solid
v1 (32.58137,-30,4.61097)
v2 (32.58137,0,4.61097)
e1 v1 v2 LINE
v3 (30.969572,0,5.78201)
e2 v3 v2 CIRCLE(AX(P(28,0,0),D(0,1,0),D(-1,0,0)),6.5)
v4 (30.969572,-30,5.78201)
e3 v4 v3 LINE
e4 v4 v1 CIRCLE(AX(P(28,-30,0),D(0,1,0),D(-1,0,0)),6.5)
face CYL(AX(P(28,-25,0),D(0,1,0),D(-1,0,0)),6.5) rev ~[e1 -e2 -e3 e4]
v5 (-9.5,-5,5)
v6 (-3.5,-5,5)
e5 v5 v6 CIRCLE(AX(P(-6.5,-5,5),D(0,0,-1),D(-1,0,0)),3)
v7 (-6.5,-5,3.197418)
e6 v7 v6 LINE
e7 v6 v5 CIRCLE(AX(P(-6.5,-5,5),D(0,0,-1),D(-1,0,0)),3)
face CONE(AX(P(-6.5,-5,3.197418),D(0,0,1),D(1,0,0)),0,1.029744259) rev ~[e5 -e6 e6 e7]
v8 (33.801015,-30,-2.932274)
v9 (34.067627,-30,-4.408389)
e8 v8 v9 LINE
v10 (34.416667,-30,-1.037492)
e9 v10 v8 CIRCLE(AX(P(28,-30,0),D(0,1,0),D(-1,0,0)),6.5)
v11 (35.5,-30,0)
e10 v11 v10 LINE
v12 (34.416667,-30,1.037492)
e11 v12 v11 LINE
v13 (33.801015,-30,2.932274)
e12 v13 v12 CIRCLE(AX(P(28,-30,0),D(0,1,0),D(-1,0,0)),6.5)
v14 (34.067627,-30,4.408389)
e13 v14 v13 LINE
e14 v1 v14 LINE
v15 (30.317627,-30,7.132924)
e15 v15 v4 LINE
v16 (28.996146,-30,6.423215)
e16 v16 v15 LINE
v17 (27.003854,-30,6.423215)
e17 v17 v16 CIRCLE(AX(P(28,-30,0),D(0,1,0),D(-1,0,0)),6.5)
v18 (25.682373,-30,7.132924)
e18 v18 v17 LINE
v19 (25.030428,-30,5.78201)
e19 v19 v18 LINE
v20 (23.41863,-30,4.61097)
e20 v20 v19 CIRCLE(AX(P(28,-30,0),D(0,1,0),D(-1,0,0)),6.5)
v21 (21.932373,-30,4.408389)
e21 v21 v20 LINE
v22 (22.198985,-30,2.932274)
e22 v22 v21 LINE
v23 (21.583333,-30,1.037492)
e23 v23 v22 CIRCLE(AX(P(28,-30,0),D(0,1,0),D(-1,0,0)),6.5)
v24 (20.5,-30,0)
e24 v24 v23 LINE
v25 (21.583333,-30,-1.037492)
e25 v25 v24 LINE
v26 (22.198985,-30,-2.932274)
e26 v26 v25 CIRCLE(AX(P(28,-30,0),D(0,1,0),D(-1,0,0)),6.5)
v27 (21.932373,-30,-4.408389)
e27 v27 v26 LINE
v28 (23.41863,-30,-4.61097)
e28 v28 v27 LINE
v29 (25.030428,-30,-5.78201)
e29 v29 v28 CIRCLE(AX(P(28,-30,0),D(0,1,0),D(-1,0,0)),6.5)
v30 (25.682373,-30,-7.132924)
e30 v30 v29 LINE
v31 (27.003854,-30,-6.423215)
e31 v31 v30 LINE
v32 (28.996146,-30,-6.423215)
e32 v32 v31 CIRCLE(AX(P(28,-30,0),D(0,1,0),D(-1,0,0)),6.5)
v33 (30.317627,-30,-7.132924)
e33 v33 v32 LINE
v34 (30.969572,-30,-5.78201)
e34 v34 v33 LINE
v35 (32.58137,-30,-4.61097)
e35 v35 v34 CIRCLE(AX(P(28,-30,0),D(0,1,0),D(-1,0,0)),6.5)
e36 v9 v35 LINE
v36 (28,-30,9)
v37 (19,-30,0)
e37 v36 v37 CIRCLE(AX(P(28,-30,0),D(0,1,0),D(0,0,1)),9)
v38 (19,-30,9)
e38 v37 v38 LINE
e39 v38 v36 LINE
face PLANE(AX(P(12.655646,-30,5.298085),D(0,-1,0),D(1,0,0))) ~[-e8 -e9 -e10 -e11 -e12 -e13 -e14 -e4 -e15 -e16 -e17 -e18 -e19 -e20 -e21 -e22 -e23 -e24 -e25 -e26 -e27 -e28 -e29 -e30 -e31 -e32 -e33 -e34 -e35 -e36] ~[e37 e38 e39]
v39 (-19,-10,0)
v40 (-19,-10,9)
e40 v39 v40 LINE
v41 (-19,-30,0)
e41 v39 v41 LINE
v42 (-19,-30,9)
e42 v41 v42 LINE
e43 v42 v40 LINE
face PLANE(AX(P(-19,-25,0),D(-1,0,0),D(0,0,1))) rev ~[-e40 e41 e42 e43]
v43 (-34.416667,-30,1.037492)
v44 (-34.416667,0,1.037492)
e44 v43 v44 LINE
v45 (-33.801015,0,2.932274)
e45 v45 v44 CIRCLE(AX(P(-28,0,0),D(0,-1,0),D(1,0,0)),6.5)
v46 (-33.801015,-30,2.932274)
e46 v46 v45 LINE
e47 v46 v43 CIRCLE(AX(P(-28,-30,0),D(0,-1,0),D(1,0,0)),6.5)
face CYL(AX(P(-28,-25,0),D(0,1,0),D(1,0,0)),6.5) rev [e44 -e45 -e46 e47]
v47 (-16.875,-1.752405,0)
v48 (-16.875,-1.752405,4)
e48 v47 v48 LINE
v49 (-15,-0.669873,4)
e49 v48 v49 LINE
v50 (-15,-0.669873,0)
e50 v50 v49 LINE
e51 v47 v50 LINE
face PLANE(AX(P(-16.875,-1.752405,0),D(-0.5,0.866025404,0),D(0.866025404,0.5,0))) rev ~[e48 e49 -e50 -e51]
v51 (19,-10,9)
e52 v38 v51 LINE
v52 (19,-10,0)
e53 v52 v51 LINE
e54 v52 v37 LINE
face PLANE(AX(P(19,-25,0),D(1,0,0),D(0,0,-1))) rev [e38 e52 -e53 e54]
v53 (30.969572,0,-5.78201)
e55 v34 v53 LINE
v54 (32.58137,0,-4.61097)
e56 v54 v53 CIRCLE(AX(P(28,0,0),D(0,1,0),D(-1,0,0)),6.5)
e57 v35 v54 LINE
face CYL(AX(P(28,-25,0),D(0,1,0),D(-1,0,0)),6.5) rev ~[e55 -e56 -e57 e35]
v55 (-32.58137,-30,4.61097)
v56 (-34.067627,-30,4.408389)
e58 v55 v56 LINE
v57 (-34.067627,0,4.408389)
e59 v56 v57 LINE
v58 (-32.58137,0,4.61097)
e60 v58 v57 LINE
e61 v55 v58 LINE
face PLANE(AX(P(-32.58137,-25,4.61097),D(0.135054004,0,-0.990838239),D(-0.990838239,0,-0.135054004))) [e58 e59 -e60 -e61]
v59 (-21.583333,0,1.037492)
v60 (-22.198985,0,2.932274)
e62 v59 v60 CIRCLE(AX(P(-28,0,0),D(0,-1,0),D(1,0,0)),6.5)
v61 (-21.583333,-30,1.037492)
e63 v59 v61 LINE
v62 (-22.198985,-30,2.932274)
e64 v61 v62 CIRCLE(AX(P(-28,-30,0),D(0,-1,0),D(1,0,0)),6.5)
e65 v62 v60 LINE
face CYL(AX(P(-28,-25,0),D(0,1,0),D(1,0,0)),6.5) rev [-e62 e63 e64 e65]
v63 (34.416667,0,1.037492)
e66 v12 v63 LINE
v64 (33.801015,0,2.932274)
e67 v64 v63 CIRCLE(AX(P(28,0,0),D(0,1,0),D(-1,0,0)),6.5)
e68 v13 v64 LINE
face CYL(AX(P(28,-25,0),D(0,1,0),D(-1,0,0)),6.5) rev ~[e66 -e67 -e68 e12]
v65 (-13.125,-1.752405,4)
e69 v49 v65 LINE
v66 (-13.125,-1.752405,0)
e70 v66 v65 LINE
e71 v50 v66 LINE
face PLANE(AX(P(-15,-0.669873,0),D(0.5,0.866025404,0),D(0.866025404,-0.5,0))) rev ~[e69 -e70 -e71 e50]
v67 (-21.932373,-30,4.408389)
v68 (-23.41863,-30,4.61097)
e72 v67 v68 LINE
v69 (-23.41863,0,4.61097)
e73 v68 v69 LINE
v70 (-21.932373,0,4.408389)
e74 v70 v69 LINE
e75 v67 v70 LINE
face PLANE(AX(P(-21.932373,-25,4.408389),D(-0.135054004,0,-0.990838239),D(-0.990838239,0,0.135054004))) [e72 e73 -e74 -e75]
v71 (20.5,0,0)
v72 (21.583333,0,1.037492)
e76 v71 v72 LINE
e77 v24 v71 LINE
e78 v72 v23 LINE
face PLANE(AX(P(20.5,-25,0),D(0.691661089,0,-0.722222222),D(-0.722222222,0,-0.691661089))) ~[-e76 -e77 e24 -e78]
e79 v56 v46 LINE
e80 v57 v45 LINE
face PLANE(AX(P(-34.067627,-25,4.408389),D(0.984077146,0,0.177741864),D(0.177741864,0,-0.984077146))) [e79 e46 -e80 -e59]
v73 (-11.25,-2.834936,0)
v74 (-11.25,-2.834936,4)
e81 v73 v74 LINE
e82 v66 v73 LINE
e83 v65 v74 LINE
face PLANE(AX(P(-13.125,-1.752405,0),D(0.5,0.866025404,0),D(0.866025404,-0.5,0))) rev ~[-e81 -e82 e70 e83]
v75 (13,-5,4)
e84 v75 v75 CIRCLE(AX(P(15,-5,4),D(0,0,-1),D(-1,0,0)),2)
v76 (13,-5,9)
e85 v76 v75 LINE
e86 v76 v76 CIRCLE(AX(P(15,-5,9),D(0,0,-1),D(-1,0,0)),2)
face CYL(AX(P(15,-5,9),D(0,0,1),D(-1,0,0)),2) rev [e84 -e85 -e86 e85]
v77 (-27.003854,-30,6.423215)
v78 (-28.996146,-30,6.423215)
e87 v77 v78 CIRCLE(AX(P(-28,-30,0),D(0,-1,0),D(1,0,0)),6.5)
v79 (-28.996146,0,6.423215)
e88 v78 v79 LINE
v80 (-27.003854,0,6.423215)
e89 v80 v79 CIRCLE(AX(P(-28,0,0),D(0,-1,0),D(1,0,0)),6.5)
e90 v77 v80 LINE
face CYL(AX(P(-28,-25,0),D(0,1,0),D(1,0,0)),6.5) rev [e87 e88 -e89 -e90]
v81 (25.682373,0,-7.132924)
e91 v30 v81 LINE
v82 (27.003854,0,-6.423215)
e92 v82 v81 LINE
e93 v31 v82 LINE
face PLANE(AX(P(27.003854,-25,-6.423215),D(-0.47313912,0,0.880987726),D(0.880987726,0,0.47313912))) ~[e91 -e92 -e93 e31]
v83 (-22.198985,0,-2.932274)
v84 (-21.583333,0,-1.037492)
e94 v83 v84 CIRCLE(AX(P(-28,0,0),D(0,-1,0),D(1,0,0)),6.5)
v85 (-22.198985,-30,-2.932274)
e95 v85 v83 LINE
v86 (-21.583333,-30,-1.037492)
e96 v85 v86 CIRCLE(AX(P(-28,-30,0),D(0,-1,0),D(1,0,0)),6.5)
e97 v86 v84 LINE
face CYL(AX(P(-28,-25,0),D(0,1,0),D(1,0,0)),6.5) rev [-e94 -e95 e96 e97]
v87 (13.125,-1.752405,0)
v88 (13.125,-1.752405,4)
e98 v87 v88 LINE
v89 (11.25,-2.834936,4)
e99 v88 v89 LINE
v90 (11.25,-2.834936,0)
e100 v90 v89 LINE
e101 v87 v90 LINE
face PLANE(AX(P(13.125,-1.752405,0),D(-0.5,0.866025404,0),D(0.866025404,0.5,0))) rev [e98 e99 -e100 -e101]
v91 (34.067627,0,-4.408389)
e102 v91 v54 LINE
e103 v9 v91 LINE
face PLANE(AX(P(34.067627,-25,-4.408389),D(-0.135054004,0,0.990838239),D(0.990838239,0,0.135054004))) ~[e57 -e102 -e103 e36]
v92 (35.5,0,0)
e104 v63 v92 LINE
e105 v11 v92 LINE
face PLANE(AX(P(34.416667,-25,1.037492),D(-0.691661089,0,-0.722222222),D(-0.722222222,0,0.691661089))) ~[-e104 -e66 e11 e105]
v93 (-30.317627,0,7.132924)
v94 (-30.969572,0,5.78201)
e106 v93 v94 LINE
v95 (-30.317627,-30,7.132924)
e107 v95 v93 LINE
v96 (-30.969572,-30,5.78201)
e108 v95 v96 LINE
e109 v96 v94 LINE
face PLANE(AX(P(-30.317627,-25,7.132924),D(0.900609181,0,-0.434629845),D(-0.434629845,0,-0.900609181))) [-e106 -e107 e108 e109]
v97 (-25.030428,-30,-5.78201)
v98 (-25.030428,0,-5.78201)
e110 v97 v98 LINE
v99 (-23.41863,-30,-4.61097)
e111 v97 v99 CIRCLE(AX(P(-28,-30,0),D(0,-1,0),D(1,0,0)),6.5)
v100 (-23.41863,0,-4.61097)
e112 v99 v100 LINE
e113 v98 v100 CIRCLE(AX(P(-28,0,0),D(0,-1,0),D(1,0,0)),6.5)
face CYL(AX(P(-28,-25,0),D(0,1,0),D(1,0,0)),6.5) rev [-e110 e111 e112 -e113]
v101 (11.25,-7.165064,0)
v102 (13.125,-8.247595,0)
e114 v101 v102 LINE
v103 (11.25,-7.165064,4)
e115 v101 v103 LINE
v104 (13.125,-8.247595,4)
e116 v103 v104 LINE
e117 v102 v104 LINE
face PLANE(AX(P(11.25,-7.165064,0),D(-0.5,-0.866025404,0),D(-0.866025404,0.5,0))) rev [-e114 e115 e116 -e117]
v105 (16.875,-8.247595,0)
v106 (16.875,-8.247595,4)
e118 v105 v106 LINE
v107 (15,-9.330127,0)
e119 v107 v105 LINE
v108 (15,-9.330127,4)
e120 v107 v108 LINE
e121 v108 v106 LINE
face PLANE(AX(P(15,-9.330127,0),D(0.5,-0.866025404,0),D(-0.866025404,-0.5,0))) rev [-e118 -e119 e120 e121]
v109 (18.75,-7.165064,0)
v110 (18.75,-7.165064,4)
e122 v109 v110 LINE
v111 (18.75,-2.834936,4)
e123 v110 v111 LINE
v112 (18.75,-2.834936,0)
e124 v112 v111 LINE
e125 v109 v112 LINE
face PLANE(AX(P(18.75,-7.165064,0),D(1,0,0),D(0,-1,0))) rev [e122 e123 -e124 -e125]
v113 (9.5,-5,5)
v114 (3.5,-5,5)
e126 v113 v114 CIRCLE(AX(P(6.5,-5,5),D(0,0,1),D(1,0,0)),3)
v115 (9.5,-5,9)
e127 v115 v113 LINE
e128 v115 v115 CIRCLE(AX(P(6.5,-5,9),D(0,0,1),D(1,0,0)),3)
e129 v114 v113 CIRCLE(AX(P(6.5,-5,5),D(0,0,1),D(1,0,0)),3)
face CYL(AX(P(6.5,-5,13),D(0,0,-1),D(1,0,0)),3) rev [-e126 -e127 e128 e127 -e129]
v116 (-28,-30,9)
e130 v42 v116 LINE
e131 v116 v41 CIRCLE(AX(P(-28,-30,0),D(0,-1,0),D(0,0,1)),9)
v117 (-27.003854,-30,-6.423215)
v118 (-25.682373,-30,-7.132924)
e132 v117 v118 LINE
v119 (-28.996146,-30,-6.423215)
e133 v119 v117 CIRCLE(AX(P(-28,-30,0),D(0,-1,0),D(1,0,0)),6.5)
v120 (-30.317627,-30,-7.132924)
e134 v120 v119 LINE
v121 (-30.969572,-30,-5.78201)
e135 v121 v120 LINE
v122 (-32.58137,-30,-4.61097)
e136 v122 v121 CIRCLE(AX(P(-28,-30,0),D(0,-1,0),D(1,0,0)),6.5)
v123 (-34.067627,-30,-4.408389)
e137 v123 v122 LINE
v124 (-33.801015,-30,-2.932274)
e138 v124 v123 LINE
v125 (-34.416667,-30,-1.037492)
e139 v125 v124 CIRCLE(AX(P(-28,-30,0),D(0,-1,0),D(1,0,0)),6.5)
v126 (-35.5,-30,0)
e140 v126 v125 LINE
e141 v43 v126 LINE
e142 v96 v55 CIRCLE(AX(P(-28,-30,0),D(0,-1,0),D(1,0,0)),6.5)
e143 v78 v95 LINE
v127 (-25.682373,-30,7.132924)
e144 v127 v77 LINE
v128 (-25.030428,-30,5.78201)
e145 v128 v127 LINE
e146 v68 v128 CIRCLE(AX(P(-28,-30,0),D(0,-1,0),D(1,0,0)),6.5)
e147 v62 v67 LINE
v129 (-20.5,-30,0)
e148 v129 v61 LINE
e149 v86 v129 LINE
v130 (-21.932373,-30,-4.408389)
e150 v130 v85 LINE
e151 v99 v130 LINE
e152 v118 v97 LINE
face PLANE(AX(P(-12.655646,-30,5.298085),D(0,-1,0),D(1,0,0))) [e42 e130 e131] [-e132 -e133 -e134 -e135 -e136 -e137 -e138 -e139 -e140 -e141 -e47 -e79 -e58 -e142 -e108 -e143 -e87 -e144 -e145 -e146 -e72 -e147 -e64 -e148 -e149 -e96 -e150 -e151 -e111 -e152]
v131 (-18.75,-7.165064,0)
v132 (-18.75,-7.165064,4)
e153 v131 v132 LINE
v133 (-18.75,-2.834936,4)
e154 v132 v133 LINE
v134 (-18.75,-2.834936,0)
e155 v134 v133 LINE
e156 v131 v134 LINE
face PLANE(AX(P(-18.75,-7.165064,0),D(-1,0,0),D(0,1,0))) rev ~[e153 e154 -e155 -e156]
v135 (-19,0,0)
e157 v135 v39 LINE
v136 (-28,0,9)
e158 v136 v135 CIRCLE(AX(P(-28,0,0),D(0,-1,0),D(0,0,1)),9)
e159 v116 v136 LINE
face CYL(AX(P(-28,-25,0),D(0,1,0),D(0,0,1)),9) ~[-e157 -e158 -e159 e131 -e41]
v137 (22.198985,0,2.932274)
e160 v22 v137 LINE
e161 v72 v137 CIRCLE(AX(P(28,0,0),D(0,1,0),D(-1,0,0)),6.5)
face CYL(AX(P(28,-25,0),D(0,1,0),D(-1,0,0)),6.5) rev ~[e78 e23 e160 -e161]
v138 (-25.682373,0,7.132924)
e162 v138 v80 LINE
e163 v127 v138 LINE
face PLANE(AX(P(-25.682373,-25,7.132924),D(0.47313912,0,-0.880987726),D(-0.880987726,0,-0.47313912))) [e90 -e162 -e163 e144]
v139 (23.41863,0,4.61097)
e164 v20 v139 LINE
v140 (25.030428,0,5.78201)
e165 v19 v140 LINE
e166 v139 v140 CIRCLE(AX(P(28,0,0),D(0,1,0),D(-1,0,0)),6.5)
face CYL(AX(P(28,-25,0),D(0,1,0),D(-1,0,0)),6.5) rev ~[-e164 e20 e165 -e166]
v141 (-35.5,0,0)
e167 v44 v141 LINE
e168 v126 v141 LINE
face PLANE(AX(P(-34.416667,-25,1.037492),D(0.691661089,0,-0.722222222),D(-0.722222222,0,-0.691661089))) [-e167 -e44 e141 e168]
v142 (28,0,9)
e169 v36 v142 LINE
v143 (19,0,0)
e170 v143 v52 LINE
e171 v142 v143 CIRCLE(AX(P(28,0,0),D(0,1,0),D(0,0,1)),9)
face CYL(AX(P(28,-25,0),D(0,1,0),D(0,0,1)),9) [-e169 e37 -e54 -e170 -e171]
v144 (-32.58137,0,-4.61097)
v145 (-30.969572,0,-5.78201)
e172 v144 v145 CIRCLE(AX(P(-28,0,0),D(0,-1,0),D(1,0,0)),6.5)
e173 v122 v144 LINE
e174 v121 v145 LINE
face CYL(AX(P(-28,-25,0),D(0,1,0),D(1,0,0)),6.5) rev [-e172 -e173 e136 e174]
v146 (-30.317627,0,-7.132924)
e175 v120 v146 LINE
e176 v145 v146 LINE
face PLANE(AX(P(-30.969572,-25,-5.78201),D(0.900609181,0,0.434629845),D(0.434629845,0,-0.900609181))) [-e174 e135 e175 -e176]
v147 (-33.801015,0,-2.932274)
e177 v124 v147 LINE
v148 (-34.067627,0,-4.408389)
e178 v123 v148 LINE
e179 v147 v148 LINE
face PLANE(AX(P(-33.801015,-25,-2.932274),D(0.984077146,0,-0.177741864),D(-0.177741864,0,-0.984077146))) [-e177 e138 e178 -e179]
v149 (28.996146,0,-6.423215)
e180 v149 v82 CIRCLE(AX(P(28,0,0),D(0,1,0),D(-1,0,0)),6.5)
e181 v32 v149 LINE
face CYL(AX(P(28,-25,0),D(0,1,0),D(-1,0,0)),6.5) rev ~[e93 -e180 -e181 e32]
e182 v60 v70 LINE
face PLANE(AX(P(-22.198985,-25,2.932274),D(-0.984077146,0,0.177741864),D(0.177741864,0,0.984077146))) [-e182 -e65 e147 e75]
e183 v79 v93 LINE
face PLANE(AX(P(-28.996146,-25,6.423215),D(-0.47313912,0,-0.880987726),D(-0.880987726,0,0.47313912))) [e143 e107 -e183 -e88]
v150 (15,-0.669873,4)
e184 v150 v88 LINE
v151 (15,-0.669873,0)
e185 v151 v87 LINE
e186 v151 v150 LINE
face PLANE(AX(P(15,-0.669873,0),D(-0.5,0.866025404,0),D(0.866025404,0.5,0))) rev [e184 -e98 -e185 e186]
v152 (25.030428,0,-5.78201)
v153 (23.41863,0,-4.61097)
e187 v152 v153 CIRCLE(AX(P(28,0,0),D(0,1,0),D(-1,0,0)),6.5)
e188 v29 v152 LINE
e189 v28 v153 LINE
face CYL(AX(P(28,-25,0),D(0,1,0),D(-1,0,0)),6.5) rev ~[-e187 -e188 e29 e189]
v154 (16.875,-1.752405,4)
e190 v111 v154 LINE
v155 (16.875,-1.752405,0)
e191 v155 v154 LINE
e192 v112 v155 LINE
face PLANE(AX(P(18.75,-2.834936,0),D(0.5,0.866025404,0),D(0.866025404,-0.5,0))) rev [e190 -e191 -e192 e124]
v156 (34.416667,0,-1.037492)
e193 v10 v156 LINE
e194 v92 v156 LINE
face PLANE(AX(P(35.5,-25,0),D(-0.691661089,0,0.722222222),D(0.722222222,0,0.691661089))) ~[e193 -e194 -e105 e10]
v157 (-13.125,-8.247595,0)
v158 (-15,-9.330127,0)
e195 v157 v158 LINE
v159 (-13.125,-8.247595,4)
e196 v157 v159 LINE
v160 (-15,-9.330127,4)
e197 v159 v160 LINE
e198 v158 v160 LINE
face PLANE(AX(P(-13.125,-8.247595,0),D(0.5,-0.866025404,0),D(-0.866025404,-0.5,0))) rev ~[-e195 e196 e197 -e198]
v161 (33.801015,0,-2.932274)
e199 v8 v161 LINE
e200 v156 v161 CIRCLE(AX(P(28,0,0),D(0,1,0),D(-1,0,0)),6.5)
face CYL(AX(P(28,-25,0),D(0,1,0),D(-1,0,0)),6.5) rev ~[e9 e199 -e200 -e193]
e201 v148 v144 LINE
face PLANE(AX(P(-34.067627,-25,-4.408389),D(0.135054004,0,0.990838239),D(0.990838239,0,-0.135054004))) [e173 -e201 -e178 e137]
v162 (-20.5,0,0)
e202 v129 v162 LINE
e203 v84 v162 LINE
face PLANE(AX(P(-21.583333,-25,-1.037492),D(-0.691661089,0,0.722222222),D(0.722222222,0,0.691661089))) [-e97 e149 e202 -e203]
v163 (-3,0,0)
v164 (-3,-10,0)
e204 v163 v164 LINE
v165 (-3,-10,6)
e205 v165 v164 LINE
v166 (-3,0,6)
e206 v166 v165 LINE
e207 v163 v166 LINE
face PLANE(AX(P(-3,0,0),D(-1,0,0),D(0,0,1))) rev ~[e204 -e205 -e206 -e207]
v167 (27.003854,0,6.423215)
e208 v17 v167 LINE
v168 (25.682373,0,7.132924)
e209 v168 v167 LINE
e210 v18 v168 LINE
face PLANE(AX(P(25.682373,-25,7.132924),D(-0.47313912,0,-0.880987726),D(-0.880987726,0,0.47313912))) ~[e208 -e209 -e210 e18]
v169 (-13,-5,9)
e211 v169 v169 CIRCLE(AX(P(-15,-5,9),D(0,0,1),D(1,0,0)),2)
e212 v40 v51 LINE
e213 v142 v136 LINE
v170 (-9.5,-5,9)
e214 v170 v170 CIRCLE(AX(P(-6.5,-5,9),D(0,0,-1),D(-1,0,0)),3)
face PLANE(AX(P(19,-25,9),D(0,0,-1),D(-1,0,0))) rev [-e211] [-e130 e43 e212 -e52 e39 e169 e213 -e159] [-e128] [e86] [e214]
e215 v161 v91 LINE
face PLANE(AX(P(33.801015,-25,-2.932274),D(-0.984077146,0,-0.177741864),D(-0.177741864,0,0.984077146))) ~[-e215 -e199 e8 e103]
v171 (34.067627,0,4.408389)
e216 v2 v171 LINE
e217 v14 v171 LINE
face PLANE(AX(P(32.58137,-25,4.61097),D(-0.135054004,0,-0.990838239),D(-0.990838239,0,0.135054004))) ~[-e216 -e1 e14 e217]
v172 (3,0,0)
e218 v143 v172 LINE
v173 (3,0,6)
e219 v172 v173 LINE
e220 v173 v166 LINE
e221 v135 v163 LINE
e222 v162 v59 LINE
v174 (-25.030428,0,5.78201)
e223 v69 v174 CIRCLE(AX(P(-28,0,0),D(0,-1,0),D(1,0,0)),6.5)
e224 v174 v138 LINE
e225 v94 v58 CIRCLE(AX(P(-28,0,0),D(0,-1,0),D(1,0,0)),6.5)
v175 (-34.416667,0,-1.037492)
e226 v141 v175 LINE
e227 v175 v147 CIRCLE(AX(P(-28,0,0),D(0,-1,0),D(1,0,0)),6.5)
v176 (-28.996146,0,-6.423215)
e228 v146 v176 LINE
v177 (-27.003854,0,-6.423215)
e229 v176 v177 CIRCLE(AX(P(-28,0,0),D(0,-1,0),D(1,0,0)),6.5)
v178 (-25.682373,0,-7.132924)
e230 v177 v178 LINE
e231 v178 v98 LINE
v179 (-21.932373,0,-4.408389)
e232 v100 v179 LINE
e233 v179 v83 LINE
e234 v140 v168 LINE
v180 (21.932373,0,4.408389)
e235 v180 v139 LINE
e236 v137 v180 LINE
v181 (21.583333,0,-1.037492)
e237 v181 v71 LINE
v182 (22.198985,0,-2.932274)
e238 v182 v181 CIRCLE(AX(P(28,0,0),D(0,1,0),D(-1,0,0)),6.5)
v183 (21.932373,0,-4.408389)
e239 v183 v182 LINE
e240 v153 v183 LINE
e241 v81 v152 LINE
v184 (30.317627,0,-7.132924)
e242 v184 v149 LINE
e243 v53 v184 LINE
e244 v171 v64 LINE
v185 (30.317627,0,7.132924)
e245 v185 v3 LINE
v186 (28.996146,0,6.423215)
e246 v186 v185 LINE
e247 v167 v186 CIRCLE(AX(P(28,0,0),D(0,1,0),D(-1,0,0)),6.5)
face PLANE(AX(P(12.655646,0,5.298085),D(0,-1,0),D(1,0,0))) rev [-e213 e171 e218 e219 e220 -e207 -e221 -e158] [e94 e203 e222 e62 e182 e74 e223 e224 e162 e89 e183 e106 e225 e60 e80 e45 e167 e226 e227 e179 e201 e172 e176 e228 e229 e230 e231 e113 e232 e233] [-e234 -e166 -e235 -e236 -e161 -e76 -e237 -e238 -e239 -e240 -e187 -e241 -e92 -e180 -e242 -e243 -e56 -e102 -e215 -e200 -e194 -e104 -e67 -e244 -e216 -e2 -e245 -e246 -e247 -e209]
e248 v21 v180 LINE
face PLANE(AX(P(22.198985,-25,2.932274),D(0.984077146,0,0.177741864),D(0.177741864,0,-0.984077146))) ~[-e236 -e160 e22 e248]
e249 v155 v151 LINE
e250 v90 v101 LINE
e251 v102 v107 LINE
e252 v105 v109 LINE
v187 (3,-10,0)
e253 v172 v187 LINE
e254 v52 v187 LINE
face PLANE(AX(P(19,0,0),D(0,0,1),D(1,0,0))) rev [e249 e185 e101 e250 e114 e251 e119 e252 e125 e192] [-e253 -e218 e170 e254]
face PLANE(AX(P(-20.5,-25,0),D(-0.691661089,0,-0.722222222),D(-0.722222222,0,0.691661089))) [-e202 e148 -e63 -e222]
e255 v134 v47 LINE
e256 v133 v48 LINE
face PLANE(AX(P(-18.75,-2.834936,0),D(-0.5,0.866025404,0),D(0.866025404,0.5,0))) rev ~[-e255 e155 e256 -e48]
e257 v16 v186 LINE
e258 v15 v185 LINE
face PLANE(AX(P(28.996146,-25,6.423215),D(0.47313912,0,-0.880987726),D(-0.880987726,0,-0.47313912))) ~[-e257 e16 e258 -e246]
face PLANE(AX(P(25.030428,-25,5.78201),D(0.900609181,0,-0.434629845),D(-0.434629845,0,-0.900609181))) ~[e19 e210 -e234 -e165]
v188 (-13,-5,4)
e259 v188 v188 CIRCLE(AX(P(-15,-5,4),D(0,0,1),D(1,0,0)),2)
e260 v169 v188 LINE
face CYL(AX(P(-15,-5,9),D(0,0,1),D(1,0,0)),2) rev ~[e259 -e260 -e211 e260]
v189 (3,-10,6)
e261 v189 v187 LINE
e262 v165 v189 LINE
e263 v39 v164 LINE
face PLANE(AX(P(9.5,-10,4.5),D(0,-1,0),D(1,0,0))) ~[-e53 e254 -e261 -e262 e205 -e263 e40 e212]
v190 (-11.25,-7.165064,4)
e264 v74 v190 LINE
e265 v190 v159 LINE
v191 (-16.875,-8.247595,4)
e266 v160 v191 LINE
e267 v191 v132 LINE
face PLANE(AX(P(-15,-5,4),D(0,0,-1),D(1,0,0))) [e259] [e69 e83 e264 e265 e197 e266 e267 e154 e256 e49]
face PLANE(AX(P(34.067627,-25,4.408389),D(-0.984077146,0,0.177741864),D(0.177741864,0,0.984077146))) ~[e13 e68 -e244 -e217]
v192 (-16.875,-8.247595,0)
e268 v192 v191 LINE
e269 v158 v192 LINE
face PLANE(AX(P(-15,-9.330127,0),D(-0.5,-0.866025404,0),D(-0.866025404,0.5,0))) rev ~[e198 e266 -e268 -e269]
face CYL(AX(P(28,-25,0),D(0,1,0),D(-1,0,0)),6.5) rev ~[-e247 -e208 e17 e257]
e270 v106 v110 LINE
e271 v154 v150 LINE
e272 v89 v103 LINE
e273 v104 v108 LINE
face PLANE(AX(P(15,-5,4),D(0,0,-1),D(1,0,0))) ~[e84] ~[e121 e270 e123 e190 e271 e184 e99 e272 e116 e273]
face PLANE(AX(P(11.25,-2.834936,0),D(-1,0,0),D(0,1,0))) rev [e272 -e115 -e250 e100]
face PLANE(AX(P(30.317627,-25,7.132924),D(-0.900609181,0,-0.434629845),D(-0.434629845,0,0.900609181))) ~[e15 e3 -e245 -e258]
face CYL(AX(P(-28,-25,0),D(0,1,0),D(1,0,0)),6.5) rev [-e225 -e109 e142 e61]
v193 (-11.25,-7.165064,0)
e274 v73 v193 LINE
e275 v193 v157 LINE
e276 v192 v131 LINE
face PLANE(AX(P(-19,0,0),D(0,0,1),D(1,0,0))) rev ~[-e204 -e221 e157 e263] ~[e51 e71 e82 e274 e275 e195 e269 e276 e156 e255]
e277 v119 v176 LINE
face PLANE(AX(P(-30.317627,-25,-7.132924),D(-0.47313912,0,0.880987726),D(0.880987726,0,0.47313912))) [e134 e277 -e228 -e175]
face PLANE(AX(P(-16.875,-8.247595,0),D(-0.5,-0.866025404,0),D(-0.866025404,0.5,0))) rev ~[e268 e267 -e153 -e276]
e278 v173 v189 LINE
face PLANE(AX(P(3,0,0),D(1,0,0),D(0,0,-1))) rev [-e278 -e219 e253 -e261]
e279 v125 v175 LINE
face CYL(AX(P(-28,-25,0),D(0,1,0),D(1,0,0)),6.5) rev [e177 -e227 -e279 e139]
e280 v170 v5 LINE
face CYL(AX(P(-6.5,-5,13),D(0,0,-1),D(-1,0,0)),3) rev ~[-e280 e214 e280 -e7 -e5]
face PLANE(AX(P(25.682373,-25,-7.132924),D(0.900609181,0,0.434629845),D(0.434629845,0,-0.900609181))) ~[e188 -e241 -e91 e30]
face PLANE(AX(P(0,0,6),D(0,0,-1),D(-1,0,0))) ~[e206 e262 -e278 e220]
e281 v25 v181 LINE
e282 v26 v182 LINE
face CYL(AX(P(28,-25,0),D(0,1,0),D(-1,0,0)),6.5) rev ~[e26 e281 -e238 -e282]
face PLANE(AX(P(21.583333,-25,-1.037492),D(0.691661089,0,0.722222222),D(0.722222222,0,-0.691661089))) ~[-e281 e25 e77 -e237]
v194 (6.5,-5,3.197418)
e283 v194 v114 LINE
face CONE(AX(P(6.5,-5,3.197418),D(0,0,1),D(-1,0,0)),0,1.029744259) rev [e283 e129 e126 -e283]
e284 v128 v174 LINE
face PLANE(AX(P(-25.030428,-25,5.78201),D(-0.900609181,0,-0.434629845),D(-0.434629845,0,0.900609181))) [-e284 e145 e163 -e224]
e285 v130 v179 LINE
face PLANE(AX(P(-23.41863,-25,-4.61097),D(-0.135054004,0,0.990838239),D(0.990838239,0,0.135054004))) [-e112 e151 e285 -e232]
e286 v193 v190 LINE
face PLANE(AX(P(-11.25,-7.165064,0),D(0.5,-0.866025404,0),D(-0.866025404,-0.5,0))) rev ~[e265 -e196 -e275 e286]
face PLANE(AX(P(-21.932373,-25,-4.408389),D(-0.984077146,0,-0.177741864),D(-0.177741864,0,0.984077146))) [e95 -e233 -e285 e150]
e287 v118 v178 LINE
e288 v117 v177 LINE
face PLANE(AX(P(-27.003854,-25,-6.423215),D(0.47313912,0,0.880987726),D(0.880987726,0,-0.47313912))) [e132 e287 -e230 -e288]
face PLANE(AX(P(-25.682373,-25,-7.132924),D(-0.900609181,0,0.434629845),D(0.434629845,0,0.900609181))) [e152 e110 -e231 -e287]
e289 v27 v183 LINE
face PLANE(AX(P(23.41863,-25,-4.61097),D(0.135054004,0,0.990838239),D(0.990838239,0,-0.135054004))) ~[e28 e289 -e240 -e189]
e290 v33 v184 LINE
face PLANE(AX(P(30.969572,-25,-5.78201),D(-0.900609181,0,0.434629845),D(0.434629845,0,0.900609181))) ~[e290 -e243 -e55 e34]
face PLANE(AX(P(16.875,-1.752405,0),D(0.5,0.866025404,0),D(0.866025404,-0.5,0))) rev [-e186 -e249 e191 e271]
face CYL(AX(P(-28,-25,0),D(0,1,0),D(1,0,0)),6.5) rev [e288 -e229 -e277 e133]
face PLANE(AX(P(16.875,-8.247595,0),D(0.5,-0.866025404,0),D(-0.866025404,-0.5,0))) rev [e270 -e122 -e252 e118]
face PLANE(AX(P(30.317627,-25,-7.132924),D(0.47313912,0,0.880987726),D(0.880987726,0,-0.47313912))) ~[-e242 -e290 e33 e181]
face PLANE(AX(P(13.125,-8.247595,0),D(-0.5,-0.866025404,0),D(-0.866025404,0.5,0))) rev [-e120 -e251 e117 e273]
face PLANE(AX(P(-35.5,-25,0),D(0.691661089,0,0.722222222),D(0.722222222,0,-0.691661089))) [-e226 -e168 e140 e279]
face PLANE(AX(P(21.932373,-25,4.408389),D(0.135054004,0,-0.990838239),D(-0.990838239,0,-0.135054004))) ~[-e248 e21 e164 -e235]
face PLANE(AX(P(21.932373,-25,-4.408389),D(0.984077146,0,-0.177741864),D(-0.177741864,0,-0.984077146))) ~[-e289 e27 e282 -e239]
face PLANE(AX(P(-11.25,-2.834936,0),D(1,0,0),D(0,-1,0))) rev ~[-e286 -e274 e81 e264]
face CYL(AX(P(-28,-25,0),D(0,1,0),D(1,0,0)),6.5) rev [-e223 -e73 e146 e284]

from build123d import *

# Parameters (mm, degrees)
F0_R            = 6.5
F1_DEPTH        = 25
F2_W            = 19
F2_H            = 9
F3_DEPTH        = 15
F4_R            = 2
F5_DEPTH        = 18.001
F7_DEPTH        = 25.001
F7_COPIES_COUNT = 10
F9_DEPTH        = 4
F10_DEPTH       = 5
F12_D           = 6
F12_DEPTH       = 4
F12_TIP         = 1.8025818571
F13_W           = 3
F13_H           = 6
F14_DEPTH       = 30.001


# Not quite as in the source:
# - a pattern or mirror of a feature is missing from the dataset's text; its kind, count and spacing are read off the source's solid


with BuildPart() as f1:
    # F0 (on Front) → F1 (new body)
    with BuildSketch(Plane.XZ):
        with BuildLine():
            Line((-19, 0), (0, 0))
            Line((0, 0), (0, 9))
            Line((0, 9), (-28, 9))
            ThreePointArc((-28, 9), (-21.6360389693, 6.3639610307), (-19, 0))
        make_face()
        with BuildLine():
            ThreePointArc((-28, 9), (-34.3639610307, -6.3639610307), (-19, 0))
            ThreePointArc((-19, 0), (-21.6360389693, 6.3639610307), (-28, 9))
        make_face()
        with Locations((-28, 0)):
            Circle(F0_R, mode=Mode.SUBTRACT)
    extrude(amount=F1_DEPTH)

    # F2 (on face) → F3 (cut)
    with BuildSketch(Plane.XZ.offset(25)):
        with Locations((-9.5, 4.5)):
            Rectangle(F2_W, F2_H)
    extrude(amount=-F3_DEPTH, mode=Mode.SUBTRACT)

    # F4 (on face) → F5 (cut, through all)
    with BuildSketch(Plane.XY.offset(9)):
        with Locations((-15, -5)):
            Circle(F4_R)
    extrude(amount=-F5_DEPTH, mode=Mode.SUBTRACT)

    # F6 (on face) → F7 (cut, through all)
    with BuildSketch(Plane.XZ.offset(25)):
        with BuildLine():
            Line((-21.5833333333, -1.0374916332), (-20.5, 0))
            Line((-20.5, 0), (-21.5833333333, 1.0374916332))
            ThreePointArc((-21.5833333333, 1.0374916332), (-21.5, 0), (-21.5833333333, -1.0374916332))
        make_face()
    f7 = extrude(amount=-F7_DEPTH, mode=Mode.SUBTRACT)

    # F7_copies: F7 ×10 about axis
    f7_copies_axis = Axis((-28, 0, 0), (0, 1, 0))
    for i in range(1, F7_COPIES_COUNT):
        add(f7.rotate(f7_copies_axis, i * 360 / F7_COPIES_COUNT), mode=Mode.SUBTRACT)

    # F8 (on face) → F9 (cut)
    with BuildSketch(Plane(origin=(0, 0, 0), x_dir=(1, 0, 0), z_dir=(0, 0, -1))):
        with BuildLine():
            ThreePointArc((-13.1250001976, 1.7524046217), (-11.7524047929, 3.1249999012), (-11.25, 5))
            ThreePointArc((-11.25, 5), (-11.7524048104, 6.8750001292), (-13.1250002583, 8.2475954133))
            ThreePointArc((-13.1250002583, 8.2475954133), (-15.0000000004, 8.75), (-16.8749997424, 8.2475954129))
            ThreePointArc((-16.8749997424, 8.2475954129), (-18.2475951898, 6.8750001288), (-18.75, 5))
            ThreePointArc((-18.75, 5), (-18.2475951898, 3.1249998712), (-16.8749997424, 1.7524045871))
            ThreePointArc((-16.8749997424, 1.7524045871), (-14.9999999654, 1.25), (-13.1250001976, 1.7524046217))
        make_face()
        with BuildLine():
            Line((-11.25, 2.8349364905), (-11.25, 5))
            ThreePointArc((-11.25, 5), (-11.7524047929, 3.1249999012), (-13.1250001976, 1.7524046217))
            Line((-13.1250001976, 1.7524046217), (-11.25, 2.8349364905))
        make_face()
        with BuildLine():
            ThreePointArc((-13.1250002583, 8.2475954133), (-11.7524048104, 6.8750001292), (-11.25, 5))
            Line((-11.25, 5), (-11.25, 7.1650635095))
            Line((-11.25, 7.1650635095), (-13.1250002583, 8.2475954133))
        make_face()
        with BuildLine():
            ThreePointArc((-16.8749997424, 8.2475954129), (-15.0000000004, 8.75), (-13.1250002583, 8.2475954133))
            Line((-13.1250002583, 8.2475954133), (-15, 9.3301270189))
            Line((-15, 9.3301270189), (-16.8749997424, 8.2475954129))
        make_face()
        with BuildLine():
            Line((-15, 0.6698729811), (-13.1250001976, 1.7524046217))
            ThreePointArc((-13.1250001976, 1.7524046217), (-14.9999999654, 1.25), (-16.8749997424, 1.7524045871))
            Line((-16.8749997424, 1.7524045871), (-15, 0.6698729811))
        make_face()
        with BuildLine():
            ThreePointArc((-18.75, 5), (-18.2475951898, 6.8750001288), (-16.8749997424, 8.2475954129))
            Line((-16.8749997424, 8.2475954129), (-18.75, 7.1650635095))
            Line((-18.75, 7.1650635095), (-18.75, 5))
        make_face()
        with BuildLine():
            Line((-18.75, 2.8349364905), (-16.8749997424, 1.7524045871))
            ThreePointArc((-16.8749997424, 1.7524045871), (-18.2475951898, 3.1249998712), (-18.75, 5))
            Line((-18.75, 5), (-18.75, 2.8349364905))
        make_face()
    extrude(amount=-F9_DEPTH, mode=Mode.SUBTRACT)

    # F10 (add): a face of the model
    f10_faces = [f1.faces().sort_by_distance(p)[0] for p in [
        (-34.1839610307, -25, -6.1839610307),
    ]]
    extrude(f10_faces, amount=F10_DEPTH)

    # F12
    with Locations(Plane.XY.offset(9)):
        with Locations((-6.5, -5)):
            Hole(F12_D / 2, depth=F12_DEPTH)
            with Locations((0, 0, -(F12_DEPTH + F12_TIP / 2))):  # 118° drill point
                Cone(0, F12_D / 2, F12_TIP, mode=Mode.SUBTRACT)

    # F13 (on face) → F14 (cut, through all)
    with BuildSketch(Plane(origin=(0, 0, 0), x_dir=(-1, 0, 0), z_dir=(0, 1, 0))):
        with Locations((1.5, 3)):
            Rectangle(F13_W, F13_H)
    extrude(amount=-F14_DEPTH, mode=Mode.SUBTRACT)

    # F15: F1 across plane


with BuildPart() as f1_1:
    add(f1.part)
    add(f1.part.mirror(Plane.YZ))


solid = f1_1.part
